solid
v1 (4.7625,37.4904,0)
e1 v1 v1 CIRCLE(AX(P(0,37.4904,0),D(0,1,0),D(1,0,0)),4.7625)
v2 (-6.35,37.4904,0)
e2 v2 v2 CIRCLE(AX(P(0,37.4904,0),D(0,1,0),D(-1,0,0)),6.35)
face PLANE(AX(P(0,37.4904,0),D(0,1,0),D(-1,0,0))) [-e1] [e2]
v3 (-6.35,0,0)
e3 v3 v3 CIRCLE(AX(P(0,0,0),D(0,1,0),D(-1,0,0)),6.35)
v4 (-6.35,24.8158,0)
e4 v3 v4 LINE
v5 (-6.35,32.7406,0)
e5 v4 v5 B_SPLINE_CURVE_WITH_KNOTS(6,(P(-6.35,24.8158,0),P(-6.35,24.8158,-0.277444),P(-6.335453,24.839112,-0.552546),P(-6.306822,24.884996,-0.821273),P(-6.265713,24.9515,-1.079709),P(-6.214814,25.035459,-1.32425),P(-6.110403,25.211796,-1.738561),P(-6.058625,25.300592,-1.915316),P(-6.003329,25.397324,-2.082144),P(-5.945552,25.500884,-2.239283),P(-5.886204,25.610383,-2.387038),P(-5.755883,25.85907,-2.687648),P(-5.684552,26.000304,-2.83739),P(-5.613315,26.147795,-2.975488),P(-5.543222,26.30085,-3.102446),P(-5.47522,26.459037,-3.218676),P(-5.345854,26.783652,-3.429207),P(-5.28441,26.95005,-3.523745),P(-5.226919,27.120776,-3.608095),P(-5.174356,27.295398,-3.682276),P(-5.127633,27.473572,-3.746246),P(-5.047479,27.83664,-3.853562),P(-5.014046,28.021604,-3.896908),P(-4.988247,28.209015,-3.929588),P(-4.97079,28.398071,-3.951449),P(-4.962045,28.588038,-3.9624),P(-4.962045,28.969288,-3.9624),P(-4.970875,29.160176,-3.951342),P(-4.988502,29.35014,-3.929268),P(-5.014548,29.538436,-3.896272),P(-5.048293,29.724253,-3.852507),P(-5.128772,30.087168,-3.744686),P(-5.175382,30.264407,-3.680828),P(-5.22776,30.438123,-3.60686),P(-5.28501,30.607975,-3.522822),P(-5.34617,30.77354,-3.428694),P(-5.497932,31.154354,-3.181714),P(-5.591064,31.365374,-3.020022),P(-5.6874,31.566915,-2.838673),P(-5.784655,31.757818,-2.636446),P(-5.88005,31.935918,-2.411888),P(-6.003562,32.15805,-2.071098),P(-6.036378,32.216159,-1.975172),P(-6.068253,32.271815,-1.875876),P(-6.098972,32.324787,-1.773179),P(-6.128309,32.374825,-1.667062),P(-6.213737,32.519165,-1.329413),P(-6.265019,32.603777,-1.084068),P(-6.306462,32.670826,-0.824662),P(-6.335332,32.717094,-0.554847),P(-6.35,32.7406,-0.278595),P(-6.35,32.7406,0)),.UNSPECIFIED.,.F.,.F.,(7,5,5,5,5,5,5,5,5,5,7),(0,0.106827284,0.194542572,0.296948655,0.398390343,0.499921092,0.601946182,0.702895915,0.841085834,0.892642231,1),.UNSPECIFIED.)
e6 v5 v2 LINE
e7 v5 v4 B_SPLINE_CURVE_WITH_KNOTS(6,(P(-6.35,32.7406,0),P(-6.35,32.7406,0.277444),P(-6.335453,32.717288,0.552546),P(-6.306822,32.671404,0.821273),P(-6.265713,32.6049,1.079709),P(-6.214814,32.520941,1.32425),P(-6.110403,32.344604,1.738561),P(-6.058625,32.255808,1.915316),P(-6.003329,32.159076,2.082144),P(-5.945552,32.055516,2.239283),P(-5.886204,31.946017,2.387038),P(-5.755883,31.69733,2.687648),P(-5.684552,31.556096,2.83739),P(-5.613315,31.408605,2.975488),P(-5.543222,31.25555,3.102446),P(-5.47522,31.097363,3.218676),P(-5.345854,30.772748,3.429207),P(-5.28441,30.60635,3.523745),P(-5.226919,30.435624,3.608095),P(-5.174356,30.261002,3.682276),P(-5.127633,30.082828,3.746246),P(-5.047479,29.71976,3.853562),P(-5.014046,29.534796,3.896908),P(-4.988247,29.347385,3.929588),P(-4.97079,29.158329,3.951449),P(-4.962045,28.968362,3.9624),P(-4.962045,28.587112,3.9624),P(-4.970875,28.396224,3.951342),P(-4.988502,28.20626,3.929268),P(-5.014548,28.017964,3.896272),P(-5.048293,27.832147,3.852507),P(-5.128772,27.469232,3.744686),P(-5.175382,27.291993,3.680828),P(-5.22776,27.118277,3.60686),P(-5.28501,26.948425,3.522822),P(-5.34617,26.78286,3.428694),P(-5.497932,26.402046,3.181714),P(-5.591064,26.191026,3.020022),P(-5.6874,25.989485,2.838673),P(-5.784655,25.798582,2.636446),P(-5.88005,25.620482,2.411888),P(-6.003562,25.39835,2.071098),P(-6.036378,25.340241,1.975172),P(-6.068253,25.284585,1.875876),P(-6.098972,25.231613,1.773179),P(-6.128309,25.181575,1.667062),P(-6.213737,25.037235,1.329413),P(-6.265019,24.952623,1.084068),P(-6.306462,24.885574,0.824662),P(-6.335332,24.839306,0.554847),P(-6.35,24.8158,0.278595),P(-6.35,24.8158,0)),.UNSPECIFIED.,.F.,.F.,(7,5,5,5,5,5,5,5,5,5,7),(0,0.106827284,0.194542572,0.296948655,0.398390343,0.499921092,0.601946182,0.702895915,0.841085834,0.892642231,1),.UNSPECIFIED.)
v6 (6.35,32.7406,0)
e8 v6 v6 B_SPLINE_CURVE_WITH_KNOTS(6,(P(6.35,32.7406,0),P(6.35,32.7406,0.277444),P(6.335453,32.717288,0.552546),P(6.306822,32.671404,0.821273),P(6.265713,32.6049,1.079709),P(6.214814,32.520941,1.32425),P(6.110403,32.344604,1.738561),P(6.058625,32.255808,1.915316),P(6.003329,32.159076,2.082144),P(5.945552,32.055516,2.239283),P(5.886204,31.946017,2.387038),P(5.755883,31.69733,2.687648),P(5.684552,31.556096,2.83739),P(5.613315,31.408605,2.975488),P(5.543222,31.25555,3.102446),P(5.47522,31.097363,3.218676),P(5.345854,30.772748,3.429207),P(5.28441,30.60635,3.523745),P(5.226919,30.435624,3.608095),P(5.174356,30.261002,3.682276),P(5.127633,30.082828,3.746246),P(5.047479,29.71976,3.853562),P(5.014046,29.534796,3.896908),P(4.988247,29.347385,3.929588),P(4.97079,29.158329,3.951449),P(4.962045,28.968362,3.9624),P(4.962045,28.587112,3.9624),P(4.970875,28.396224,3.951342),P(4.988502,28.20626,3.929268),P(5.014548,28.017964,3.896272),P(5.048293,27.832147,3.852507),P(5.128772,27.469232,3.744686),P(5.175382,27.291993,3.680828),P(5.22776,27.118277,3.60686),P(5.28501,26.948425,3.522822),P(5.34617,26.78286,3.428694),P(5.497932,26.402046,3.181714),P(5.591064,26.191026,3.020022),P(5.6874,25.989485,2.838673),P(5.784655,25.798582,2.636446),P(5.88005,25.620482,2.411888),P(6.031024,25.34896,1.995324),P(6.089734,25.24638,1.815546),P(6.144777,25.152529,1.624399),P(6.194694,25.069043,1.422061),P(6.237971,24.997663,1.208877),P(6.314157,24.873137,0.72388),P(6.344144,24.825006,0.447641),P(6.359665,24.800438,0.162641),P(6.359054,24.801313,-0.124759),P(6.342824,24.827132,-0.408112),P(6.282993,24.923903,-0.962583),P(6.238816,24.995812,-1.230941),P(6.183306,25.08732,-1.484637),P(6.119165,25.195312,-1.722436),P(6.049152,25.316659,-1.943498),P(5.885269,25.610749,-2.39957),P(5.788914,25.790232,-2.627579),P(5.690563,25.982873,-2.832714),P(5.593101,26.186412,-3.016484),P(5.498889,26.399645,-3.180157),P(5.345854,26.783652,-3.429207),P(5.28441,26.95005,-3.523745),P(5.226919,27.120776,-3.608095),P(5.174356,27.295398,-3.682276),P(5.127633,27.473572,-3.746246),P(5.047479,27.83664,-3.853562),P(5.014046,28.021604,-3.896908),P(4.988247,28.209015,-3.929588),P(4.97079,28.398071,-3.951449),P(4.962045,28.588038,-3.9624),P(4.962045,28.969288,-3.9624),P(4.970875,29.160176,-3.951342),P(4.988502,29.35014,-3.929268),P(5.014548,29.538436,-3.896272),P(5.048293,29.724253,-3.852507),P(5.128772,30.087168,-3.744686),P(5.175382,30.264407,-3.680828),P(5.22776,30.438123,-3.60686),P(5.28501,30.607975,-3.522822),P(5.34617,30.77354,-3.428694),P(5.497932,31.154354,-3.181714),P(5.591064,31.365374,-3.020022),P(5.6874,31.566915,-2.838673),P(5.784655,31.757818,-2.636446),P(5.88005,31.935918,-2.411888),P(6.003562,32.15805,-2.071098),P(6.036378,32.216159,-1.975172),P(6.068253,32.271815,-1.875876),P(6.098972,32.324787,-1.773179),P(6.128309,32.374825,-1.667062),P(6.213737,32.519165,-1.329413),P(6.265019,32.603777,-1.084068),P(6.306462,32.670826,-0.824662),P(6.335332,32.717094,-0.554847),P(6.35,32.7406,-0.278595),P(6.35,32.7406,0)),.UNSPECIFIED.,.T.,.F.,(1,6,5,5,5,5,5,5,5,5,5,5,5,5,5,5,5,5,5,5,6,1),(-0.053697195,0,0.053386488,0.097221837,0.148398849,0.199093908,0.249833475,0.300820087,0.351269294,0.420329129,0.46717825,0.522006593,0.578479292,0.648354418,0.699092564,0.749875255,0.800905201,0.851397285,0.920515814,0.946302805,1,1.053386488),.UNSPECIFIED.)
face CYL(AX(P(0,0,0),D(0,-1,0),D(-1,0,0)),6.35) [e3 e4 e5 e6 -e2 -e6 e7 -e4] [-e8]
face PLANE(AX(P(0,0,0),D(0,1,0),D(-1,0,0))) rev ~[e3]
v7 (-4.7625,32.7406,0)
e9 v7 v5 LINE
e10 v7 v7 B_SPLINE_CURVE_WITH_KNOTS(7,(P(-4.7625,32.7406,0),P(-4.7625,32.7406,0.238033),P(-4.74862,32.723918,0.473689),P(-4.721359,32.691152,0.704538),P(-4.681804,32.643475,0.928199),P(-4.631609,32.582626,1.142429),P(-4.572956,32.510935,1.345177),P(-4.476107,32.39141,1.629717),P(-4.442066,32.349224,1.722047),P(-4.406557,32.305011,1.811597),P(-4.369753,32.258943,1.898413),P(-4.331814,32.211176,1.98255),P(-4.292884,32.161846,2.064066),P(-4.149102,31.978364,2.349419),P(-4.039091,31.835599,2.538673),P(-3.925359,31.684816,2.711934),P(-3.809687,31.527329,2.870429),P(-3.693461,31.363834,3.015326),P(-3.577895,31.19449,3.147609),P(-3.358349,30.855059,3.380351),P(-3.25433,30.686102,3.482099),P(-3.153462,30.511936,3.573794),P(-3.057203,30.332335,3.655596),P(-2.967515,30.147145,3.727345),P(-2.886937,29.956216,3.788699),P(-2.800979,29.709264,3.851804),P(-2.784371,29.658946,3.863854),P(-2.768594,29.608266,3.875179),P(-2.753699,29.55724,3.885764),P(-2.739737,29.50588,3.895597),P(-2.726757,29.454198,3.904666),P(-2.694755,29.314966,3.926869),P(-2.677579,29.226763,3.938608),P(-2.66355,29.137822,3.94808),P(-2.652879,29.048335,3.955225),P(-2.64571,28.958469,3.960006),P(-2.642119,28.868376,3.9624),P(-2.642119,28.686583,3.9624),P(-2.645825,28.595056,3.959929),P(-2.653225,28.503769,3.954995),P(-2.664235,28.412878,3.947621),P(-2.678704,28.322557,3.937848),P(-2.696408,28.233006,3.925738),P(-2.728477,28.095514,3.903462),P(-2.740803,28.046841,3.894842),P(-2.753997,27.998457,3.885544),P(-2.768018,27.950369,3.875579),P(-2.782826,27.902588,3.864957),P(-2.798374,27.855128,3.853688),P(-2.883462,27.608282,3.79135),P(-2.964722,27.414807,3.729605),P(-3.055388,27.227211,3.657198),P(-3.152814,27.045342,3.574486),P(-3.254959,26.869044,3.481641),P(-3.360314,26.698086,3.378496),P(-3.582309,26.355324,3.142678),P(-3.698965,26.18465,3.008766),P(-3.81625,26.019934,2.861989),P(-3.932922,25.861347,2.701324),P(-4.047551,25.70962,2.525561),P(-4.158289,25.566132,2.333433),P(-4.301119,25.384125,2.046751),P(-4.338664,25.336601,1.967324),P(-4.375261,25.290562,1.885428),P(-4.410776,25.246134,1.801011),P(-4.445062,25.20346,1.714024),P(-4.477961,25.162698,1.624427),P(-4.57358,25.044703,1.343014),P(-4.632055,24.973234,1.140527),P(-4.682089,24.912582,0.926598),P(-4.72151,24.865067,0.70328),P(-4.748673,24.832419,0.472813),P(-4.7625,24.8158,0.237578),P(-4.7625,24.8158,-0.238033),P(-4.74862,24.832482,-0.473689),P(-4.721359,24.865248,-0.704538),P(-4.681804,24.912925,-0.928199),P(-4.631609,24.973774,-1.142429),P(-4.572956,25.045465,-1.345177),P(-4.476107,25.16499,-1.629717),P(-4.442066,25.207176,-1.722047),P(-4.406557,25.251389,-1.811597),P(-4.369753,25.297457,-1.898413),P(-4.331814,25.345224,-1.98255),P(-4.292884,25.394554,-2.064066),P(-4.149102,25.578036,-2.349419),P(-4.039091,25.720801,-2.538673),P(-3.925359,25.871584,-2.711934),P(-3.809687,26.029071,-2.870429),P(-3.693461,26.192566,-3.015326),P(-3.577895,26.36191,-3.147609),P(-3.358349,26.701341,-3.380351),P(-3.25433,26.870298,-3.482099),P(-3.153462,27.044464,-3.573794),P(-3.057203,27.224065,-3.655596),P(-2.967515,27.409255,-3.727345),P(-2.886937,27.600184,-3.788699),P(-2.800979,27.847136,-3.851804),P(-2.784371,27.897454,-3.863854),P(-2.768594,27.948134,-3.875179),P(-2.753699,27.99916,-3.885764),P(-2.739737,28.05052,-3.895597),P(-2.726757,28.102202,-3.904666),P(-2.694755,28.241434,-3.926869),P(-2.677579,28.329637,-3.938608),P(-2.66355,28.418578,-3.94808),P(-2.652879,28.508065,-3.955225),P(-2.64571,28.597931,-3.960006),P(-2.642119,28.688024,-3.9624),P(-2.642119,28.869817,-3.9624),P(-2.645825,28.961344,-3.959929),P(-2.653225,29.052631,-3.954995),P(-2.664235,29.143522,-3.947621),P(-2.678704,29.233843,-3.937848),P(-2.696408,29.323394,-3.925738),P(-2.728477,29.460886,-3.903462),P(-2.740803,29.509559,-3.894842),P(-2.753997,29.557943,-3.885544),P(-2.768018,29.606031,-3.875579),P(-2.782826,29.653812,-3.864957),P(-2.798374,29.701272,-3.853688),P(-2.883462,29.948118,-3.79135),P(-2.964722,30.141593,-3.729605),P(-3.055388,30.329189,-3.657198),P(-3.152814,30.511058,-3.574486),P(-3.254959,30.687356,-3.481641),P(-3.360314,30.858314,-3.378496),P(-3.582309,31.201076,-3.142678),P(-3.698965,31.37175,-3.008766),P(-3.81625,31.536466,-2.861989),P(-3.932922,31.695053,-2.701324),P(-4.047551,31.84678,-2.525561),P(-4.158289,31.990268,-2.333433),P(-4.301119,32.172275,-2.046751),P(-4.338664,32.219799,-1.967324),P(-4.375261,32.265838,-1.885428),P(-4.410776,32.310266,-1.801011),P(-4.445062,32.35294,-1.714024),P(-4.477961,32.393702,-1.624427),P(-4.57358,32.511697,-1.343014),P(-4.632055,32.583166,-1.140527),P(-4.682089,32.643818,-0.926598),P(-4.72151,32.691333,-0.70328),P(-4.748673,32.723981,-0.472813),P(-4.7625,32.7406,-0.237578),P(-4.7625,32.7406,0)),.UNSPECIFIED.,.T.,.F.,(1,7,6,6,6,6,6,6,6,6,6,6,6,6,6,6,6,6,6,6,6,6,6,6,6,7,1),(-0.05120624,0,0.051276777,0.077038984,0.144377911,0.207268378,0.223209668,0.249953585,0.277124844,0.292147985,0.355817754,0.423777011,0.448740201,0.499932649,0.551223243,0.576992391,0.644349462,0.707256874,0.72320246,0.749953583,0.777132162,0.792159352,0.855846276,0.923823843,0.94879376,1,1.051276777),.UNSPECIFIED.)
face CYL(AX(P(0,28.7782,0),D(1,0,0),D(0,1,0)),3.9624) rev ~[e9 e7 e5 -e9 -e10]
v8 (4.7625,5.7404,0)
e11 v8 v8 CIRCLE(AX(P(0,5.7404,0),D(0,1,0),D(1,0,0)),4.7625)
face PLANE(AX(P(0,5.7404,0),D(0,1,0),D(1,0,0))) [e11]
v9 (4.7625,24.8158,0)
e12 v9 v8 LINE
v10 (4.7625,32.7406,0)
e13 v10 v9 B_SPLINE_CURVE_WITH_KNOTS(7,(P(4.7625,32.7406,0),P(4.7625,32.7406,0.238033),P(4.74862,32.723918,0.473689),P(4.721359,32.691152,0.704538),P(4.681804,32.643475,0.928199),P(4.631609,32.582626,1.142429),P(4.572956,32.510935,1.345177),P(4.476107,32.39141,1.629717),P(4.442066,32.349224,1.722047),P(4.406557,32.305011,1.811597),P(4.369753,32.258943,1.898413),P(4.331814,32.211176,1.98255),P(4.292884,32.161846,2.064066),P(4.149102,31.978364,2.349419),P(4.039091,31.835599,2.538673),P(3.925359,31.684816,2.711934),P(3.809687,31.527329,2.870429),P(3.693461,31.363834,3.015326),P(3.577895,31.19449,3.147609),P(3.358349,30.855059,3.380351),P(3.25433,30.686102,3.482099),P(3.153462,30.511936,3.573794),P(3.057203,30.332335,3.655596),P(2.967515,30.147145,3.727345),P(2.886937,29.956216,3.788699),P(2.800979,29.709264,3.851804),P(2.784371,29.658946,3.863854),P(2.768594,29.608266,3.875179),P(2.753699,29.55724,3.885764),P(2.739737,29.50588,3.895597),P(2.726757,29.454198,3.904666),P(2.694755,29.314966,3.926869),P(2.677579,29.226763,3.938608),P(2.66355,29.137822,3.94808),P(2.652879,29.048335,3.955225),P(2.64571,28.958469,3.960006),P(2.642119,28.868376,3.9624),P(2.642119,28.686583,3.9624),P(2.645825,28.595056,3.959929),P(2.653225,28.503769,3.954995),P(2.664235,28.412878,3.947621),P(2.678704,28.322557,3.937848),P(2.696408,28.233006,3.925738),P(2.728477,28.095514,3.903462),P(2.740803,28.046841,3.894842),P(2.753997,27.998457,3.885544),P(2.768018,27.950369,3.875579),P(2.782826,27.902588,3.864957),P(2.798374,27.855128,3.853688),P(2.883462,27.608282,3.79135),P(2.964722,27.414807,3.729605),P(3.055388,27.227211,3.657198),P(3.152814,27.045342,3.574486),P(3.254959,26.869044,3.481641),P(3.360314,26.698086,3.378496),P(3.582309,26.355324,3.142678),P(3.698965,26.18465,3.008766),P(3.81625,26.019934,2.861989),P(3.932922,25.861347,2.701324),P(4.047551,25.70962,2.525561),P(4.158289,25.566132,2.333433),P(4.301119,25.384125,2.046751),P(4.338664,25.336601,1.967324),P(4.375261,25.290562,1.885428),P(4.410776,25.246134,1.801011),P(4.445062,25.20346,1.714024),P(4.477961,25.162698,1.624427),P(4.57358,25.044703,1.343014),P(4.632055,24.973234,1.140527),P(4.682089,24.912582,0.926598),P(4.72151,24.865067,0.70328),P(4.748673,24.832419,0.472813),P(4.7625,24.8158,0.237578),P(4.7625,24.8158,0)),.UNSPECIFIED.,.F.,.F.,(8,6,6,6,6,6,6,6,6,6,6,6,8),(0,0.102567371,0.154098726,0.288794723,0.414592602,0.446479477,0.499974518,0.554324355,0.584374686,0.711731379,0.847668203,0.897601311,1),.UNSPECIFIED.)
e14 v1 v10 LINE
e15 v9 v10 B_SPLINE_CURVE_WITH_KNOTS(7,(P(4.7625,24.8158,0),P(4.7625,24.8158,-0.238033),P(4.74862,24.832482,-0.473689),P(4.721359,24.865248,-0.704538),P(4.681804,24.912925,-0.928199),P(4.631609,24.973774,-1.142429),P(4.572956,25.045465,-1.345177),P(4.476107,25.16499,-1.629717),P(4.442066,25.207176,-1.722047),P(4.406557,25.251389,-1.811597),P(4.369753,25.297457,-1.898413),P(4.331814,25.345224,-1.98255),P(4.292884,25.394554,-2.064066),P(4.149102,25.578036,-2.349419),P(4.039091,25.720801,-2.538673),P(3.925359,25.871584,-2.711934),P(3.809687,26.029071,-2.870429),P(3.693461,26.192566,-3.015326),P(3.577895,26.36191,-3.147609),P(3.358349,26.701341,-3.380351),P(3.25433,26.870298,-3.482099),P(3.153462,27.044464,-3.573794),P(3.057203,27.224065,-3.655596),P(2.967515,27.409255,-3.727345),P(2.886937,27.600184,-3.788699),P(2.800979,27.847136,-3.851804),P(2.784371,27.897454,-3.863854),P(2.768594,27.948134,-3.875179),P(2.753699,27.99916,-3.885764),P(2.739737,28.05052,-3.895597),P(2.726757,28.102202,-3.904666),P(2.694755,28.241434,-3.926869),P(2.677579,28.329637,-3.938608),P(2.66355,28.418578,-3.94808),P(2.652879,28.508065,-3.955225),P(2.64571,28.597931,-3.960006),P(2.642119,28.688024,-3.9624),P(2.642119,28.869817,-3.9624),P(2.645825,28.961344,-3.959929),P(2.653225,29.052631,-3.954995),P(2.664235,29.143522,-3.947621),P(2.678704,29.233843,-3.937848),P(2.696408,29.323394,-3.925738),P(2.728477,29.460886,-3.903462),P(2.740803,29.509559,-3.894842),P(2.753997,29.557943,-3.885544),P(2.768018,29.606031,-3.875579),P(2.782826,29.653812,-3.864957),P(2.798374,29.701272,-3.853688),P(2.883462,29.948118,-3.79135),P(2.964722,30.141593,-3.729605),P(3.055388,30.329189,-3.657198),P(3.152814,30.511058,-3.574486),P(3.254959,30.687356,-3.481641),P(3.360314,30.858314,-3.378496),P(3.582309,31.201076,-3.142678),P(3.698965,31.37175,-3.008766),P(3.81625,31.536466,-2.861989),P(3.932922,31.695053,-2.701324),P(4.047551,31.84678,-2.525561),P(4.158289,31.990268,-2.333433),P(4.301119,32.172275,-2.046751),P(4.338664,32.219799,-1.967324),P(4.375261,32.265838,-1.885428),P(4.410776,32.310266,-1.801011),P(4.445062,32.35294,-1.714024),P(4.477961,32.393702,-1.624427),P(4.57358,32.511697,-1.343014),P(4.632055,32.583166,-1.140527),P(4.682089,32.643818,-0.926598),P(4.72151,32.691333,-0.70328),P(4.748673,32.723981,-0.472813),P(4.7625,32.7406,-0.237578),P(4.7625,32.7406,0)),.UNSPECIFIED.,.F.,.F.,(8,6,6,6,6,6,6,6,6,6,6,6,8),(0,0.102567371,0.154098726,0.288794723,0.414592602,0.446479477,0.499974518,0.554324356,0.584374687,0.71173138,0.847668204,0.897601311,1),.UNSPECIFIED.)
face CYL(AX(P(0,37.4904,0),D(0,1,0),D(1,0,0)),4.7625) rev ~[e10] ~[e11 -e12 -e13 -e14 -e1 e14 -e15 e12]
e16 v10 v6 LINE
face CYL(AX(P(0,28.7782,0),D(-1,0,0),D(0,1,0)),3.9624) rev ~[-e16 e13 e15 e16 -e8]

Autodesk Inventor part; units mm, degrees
ref_plane "YZ Plane" through (0, 0, 0) normal (1, 0, 0) x (0, 1, 0)
ref_plane "XZ Plane" through (0, 0, 0) normal (0, 1, 0) x (-1, 0, 0)
ref_plane "XY Plane" through (0, 0, 0) normal (0, 0, 1) x (1, 0, 0)
sketch "Sketch1" plane through (0, 0, 0) normal (0, 1, 0) x (-1, 0, 0)
  circle A0 centre (0, 0) radius 6.35
  dimension "d0" = 12.7
extrude "Extrusion1" add sketch "Sketch1" along normal blind 37.4904
sketch "Sketch3" plane through (0, 37.4904, 0) normal (0, 1, 0) x (1, 0, 0)
  circle A0 centre (0, 0) radius 4.7625
  dimension "d10" = 9.525
extrude "Extrusion3" cut sketch "Sketch3" against normal blind 31.75
sketch "Sketch4" plane through (0, 0, 0) normal (1, 0, 0) x (0, 1, 0)
  line L0 (37.4904, -6.35) -> (37.4904, 6.35) projected
  line L1 (0, -6.35) -> (37.4904, -6.35) projected
  line L2 (0, 6.35) -> (37.4904, 6.35) projected
  line L3 (0, 6.35) -> (0, -6.35) projected
  circle A0 centre (28.7782, 0) radius 3.9624
  point P0 (0, 0)
  dimension "d13" = 7.9248
  dimension "d14" = 28.7782
  dimension "d15" = 6.35
extrude "Extrusion4" cut sketch "Sketch4" along normal mid plane 25.4 contours A0
properties part number "Piston"
